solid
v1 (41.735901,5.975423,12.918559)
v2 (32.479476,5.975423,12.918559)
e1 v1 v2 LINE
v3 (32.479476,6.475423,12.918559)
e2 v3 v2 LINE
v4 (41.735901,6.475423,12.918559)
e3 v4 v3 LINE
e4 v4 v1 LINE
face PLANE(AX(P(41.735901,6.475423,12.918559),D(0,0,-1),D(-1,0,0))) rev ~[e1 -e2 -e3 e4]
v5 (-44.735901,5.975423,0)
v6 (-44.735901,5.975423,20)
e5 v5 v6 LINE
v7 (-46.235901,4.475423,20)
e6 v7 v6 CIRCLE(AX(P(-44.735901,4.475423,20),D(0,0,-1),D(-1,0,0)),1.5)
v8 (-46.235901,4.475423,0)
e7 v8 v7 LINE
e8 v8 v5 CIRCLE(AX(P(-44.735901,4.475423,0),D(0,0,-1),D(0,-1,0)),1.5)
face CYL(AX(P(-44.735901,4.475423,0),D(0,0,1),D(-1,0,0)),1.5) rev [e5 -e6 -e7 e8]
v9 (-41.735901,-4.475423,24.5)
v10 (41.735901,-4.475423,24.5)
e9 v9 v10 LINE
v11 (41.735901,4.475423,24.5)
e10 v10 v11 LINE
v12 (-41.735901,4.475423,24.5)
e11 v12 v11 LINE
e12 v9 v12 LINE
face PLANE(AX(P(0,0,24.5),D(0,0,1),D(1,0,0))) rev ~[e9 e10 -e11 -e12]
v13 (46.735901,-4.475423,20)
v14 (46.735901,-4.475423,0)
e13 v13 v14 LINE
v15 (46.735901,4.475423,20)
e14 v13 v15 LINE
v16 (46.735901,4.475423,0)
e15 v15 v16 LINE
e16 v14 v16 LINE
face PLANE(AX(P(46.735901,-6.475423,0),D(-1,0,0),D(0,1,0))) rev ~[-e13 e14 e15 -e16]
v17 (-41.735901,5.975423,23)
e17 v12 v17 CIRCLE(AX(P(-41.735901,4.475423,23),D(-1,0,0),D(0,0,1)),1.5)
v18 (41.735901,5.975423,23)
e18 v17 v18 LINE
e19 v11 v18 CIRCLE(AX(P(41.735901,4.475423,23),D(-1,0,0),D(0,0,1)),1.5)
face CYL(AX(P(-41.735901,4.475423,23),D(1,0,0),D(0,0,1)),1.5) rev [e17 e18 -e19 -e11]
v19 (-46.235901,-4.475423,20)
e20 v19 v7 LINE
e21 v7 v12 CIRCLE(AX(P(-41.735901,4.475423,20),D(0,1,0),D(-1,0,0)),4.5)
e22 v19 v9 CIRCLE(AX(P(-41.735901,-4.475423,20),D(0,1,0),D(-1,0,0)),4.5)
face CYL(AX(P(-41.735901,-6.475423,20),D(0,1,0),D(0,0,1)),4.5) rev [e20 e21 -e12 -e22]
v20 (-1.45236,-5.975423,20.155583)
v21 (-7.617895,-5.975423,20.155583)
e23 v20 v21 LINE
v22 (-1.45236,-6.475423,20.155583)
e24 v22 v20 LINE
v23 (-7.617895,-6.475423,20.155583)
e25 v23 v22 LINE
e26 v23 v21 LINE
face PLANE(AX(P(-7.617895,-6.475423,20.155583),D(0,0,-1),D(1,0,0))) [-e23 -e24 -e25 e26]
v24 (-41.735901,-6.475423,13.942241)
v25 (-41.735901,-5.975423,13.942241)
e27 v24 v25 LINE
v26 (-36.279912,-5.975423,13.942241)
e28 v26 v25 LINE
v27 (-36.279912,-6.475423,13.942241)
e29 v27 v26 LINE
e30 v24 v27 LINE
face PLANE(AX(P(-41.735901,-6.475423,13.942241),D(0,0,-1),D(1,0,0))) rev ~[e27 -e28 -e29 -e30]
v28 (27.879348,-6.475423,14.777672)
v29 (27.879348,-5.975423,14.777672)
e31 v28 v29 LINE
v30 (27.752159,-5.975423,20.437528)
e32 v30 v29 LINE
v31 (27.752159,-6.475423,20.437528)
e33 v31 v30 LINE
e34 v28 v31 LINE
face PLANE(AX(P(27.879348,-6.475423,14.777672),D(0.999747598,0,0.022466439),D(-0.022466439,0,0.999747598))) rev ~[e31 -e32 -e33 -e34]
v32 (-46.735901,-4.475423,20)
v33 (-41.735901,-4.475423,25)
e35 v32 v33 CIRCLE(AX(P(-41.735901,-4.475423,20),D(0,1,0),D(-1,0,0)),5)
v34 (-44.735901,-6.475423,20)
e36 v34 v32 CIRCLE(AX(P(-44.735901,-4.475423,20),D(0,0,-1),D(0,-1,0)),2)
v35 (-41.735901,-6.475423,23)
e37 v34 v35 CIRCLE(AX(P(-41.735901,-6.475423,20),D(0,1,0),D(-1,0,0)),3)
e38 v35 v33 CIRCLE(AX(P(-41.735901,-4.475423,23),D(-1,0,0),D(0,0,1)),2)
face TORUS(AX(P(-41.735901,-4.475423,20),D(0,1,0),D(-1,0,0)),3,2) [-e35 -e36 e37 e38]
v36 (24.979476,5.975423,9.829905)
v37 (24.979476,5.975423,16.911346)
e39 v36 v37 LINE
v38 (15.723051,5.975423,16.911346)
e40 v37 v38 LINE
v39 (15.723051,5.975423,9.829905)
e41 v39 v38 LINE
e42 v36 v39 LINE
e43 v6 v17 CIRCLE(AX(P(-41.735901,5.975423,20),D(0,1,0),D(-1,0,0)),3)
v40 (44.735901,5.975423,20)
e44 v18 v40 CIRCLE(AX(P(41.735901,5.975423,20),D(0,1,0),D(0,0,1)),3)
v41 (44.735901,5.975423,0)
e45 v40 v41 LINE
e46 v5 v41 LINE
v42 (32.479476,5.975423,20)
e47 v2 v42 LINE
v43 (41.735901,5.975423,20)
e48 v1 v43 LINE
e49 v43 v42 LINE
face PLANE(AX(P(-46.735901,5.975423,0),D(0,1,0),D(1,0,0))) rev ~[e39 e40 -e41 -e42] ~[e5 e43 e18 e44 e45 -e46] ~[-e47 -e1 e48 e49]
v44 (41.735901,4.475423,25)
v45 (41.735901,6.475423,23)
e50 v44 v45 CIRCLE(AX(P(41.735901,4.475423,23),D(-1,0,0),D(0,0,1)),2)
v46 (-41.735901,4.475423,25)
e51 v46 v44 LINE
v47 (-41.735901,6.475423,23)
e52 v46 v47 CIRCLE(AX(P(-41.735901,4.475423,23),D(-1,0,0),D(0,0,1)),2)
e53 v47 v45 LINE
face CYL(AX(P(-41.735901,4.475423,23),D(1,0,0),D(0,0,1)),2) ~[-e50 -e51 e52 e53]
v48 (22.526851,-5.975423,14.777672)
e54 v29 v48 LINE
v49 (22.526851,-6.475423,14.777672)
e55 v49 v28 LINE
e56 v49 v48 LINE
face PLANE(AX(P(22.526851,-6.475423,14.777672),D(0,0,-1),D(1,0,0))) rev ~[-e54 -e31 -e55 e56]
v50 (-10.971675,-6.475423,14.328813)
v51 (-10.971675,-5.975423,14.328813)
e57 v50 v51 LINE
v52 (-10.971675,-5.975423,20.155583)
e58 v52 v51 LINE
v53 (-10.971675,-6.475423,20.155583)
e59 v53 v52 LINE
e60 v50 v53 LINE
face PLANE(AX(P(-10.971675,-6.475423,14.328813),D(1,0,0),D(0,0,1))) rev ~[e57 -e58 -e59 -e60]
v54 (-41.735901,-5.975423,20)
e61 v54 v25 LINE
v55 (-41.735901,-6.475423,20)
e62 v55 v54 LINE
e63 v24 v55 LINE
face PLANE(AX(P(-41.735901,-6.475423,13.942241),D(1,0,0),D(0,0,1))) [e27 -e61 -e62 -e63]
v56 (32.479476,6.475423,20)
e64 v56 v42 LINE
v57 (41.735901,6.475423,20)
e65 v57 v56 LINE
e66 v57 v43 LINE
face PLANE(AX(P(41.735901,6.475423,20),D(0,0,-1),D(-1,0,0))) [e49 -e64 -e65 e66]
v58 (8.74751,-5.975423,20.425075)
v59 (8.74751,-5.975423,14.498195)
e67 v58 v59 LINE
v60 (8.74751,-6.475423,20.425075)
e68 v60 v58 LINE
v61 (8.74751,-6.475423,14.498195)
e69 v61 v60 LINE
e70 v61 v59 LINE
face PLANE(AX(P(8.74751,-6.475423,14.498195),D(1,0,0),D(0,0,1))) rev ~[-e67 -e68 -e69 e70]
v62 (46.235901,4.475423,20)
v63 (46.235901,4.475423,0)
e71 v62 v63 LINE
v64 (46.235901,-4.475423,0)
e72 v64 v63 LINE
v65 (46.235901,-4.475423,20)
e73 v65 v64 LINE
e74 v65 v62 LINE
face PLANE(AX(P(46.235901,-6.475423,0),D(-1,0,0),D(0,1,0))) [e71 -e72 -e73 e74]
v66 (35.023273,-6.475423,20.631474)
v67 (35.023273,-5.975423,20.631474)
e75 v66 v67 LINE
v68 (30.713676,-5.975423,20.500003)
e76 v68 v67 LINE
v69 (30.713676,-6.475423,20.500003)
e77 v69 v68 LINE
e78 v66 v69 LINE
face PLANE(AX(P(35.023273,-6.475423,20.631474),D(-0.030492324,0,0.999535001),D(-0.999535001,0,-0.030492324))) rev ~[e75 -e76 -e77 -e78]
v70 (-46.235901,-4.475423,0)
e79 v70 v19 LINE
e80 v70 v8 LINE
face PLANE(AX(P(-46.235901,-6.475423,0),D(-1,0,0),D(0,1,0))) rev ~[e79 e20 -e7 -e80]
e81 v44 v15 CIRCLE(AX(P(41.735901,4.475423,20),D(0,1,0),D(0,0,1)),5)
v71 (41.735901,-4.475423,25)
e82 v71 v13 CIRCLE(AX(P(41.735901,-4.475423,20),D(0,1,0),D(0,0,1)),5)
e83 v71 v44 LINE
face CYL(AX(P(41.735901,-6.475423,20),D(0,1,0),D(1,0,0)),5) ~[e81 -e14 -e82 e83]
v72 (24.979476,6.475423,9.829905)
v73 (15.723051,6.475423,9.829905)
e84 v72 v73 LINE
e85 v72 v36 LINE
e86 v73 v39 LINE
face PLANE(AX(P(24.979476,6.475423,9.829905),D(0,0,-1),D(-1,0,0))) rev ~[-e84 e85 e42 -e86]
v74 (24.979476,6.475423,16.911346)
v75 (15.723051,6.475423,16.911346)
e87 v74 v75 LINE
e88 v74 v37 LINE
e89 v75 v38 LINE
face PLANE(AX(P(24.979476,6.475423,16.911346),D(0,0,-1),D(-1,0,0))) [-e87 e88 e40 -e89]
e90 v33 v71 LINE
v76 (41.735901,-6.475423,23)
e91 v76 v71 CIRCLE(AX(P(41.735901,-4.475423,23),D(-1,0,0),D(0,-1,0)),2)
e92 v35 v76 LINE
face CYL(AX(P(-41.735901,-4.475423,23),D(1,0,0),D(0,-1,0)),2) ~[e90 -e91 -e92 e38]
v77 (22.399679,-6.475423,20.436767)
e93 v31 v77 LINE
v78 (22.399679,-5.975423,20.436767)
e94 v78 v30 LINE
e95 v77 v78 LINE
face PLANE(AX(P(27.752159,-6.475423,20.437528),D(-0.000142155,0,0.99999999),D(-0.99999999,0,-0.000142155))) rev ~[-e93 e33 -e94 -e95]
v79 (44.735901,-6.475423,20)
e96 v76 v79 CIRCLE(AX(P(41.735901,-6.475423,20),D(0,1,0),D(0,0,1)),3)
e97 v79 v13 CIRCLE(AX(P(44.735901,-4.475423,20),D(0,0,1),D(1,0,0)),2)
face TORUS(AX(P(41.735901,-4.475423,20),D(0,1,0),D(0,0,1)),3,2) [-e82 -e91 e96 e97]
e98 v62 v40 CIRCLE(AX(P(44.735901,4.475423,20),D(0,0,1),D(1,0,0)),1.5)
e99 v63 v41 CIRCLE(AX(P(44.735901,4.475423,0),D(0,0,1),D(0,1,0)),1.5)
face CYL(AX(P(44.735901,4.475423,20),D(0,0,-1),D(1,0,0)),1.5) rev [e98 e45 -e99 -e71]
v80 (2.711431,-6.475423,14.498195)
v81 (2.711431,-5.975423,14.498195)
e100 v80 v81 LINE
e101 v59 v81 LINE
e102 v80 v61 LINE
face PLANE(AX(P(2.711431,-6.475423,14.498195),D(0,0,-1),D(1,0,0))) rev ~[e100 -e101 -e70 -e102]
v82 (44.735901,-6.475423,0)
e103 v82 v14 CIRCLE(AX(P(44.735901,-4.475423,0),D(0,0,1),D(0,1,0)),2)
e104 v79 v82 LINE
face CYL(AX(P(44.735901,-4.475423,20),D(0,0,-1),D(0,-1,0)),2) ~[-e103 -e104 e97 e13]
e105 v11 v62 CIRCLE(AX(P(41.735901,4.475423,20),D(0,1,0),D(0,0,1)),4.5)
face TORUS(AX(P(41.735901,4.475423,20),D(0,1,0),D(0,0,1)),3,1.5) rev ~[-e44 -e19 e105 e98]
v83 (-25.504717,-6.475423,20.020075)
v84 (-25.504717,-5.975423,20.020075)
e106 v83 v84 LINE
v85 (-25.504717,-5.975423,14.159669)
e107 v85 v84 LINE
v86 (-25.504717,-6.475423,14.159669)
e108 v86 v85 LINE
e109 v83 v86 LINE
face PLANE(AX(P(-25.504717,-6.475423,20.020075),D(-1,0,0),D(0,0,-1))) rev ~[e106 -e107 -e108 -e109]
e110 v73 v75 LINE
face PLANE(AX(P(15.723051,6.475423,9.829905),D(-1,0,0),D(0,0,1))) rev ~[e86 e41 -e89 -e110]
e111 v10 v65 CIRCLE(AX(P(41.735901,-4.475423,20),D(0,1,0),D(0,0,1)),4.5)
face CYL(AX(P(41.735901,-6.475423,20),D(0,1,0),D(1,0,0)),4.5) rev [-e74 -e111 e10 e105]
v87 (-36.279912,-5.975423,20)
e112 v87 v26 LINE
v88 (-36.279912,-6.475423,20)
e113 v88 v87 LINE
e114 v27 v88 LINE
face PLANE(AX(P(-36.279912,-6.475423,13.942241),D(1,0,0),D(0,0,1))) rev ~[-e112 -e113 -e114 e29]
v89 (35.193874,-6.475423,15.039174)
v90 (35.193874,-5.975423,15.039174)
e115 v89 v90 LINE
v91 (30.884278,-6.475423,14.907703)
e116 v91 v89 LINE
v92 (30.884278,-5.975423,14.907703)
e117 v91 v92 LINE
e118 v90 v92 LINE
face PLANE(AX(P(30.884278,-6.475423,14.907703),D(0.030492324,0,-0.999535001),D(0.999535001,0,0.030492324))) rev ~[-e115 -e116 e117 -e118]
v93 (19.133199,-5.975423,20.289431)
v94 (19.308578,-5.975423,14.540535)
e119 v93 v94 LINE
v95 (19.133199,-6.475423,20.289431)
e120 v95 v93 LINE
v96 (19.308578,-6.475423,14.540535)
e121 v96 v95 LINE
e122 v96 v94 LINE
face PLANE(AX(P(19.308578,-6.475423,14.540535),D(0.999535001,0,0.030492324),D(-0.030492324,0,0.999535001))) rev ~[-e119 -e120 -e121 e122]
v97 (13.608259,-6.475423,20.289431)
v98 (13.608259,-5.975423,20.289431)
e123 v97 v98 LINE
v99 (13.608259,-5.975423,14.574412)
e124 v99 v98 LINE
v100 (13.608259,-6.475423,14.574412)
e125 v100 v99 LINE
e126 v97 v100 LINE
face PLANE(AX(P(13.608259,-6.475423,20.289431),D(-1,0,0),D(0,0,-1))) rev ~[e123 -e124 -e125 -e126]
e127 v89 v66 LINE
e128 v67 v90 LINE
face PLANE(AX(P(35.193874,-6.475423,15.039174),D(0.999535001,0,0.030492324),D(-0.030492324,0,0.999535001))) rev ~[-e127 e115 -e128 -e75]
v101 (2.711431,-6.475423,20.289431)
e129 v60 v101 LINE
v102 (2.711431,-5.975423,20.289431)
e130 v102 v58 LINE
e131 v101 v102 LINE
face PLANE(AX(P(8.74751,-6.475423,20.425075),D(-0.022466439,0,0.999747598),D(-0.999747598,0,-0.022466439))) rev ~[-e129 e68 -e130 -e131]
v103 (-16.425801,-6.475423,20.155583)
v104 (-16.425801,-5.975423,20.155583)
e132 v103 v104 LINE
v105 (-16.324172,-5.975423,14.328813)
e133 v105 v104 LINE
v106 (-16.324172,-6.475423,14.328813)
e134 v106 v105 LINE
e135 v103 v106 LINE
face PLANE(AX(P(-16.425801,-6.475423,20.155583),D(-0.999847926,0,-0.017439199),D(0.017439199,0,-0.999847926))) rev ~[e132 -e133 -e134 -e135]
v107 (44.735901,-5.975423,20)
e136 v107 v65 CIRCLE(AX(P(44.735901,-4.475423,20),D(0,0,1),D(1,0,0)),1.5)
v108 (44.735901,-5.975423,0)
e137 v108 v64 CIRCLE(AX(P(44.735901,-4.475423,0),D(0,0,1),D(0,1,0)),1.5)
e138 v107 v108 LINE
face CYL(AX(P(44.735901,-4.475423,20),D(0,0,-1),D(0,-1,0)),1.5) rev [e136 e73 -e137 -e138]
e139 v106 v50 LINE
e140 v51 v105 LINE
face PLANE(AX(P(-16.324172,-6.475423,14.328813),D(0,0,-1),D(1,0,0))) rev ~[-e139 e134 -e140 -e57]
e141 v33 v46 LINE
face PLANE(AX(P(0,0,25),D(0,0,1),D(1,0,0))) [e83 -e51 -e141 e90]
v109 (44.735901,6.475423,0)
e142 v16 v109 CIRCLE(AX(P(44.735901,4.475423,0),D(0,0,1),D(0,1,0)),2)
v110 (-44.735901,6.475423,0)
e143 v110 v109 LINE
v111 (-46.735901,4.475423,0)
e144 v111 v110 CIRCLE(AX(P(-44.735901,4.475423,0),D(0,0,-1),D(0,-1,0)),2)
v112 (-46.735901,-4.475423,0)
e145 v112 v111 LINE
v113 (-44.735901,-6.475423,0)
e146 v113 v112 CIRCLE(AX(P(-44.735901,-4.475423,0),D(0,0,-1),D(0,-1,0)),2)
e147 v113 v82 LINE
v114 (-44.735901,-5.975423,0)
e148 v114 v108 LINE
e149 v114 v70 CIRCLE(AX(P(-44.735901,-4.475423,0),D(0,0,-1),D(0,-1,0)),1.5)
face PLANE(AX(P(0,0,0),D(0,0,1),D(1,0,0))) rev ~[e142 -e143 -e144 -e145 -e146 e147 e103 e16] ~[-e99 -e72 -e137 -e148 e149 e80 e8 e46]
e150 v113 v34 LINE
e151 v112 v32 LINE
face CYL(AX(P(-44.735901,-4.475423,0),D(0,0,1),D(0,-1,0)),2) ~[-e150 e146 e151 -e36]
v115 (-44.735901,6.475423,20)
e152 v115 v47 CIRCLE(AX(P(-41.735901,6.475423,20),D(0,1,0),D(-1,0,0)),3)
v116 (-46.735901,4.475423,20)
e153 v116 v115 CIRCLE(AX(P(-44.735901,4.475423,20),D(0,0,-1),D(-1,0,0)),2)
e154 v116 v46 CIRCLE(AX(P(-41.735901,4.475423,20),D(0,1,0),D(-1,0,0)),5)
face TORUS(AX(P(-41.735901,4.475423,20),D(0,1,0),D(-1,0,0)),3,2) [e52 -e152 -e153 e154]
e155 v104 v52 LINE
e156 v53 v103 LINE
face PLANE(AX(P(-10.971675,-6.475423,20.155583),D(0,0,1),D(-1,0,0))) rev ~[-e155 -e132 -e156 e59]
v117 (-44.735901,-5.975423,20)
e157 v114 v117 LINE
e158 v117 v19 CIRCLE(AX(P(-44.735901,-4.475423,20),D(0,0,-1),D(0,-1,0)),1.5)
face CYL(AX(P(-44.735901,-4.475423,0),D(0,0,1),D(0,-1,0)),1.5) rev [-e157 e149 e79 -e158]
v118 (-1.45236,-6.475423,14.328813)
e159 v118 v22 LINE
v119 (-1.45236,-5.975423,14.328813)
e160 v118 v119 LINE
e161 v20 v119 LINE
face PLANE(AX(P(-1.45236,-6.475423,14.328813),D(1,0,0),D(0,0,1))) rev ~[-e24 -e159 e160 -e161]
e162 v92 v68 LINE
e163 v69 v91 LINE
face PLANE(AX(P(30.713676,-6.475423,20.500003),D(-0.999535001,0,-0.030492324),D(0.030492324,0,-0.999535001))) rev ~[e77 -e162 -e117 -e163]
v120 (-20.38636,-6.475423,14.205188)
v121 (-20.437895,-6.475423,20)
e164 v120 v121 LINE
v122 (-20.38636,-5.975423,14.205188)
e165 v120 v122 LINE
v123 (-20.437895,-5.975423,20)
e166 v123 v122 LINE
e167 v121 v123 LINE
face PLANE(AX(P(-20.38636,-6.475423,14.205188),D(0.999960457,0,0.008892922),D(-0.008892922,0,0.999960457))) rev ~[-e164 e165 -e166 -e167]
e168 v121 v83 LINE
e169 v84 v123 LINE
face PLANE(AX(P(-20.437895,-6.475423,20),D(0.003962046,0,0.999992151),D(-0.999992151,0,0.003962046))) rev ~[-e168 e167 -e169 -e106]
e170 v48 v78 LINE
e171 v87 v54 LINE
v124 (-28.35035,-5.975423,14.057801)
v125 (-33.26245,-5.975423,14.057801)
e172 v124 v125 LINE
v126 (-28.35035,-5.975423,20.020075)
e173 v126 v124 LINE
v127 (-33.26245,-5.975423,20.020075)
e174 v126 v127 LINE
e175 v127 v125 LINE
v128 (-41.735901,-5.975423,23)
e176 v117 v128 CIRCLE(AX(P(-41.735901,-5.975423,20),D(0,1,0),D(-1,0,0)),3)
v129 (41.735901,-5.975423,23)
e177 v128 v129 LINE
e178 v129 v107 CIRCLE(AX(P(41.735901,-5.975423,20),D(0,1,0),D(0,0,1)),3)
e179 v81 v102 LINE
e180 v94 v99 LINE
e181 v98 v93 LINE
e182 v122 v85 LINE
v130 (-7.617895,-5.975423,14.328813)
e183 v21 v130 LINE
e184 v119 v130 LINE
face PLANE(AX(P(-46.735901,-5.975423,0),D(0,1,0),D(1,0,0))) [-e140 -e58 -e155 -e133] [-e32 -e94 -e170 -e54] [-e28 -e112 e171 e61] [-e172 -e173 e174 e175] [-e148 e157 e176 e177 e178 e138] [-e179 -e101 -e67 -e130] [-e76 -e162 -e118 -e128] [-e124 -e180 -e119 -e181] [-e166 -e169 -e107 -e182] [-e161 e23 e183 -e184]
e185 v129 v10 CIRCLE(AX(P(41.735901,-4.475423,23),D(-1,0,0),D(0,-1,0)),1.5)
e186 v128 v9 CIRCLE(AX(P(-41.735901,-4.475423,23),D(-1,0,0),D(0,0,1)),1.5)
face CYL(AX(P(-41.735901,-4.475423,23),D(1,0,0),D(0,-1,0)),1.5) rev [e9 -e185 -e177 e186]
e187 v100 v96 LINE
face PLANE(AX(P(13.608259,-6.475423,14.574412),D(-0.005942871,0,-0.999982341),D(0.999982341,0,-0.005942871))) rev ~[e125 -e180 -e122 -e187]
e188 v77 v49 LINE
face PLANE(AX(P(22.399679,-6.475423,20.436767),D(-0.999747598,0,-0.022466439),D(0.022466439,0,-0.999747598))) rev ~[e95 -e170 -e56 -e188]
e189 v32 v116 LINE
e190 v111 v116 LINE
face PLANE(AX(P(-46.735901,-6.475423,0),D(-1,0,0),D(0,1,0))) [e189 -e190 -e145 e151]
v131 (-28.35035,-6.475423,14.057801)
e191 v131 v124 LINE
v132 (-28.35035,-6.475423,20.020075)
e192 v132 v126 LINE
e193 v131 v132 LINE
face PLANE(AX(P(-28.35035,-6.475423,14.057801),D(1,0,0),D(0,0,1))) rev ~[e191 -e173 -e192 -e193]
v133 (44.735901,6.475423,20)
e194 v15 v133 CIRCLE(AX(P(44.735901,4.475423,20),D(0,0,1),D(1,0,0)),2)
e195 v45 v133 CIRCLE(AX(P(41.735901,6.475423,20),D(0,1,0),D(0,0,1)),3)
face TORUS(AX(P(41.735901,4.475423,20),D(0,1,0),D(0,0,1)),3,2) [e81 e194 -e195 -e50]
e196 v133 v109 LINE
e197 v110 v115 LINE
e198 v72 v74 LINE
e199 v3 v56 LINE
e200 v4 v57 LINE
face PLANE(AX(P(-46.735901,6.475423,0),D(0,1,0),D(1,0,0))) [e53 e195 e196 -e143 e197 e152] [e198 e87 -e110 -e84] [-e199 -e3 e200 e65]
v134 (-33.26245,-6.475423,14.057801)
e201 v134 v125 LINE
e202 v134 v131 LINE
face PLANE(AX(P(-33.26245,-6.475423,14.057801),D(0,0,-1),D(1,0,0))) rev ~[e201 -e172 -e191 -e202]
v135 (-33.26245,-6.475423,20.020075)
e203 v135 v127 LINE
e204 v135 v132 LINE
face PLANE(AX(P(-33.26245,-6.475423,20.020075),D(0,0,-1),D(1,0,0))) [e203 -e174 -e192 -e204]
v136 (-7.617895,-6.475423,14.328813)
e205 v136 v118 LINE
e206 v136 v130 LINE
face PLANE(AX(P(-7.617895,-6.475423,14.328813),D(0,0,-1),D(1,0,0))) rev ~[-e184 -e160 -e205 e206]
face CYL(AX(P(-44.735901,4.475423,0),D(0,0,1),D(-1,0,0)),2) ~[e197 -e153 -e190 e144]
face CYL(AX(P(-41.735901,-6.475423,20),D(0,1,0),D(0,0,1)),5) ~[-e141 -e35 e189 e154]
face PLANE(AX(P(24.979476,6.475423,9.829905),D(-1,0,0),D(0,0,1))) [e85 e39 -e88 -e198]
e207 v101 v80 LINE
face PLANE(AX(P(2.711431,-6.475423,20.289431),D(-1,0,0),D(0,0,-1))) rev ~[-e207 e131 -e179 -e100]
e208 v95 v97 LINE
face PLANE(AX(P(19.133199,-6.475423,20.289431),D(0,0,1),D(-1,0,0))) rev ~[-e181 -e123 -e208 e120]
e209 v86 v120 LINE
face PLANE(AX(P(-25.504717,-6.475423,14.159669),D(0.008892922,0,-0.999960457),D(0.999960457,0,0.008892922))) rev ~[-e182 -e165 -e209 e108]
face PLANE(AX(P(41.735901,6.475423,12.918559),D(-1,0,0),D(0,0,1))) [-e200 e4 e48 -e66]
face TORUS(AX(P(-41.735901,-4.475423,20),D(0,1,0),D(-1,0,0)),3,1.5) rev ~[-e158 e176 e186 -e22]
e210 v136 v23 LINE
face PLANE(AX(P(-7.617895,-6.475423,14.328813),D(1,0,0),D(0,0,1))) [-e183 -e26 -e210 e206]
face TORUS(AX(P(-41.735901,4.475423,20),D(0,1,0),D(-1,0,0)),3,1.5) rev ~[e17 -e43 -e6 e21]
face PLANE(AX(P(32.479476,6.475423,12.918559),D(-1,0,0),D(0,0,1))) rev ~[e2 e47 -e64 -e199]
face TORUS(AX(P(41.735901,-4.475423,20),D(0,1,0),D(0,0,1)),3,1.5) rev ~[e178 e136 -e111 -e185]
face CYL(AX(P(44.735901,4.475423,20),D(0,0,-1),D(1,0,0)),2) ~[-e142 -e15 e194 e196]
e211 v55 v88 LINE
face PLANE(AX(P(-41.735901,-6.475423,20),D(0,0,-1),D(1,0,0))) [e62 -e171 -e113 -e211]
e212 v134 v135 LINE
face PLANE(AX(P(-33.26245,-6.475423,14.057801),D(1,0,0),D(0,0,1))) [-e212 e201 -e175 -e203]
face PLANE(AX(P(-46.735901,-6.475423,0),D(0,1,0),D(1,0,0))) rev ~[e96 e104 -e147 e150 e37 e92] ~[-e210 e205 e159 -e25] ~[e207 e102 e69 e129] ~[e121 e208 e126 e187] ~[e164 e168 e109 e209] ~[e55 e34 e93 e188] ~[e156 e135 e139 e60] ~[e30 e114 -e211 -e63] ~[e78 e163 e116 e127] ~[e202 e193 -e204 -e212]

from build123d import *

# Parameters (mm, degrees)
F0_W     = 93.4718027711
F0_H     = 12.9508469254
F1_DEPTH = 25
F2_R     = 5
F3_R     = 5
F4_R     = 2
F5_T     = -0.5
F6_W     = 5.4559892522
F6_H     = 6.0577589622
F6_W_2   = 4.9121007323
F6_H_2   = 5.9622740373
F6_W_3   = 6.1655344907
F6_H_3   = 5.8267693967
F7_DEPTH = 10
F8_W     = 9.2564252019
F8_H     = 7.081441097
F9_DEPTH = 5


with BuildPart() as f1:
    # F0 (on Top) → F1 (new body)
    with BuildSketch(Plane.XY):
        Rectangle(F0_W, F0_H)
    extrude(amount=F1_DEPTH)

    # F2
    f2_edges = [f1.edges().sort_by_distance(p)[0] for p in [
        (46.735901, 0, 25),
    ]]
    fillet(f2_edges, radius=F2_R)

    # F3
    f3_edges = [f1.edges().sort_by_distance(p)[0] for p in [
        (-46.735901, 0, 25),
    ]]
    fillet(f3_edges, radius=F3_R)

    # F4
    f4_edges = [f1.edges().sort_by_distance(p)[0] for p in [
        (0, -6.475423, 25),
        (0, 6.475423, 25),
        (46.735901, 6.475423, 10),
        (46.735901, -6.475423, 10),
        (-46.735901, -6.475423, 10),
        (-45.271435, -6.475423, 23.535534),
        (45.271435, -6.475423, 23.535534),
        (-45.271435, 6.475423, 23.535534),
        (45.271435, 6.475423, 23.535534),
        (-46.735901, 6.475423, 10),
    ]]
    fillet(f4_edges, radius=F4_R)

    # F5
    f5_openings = [f1.faces().sort_by_distance(p)[0] for p in [
        (0, 0, 0),
    ]]
    offset(amount=F5_T, openings=f5_openings)

    # F6 (on face) → F7 (cut)
    with BuildSketch(Plane.XZ.offset(6.4754234627)):
        with Locations((-39.0079067595, 16.9711205189)):
            Rectangle(F6_W, F6_H)
        with Locations((-30.8063998818, 17.0389381237)):
            Rectangle(F6_W_2, F6_H_2)
        Polygon((-25.5047174612, 20.0200751424), (-25.5047174612, 14.1596693691), (-20.3863596622, 14.2051883272), (-20.43789451, 20), align=None)
        Polygon((-16.4258014411, 20.155582577), (-16.3241717964, 14.3288131803), (-10.9716746956, 14.3288131803), (-10.9716746956, 20.155582577), align=None)
        with Locations((-4.5351273147, 17.2421978787)):
            Rectangle(F6_W_3, F6_H_3)
        Polygon((2.711430509, 20.2894311491), (2.711430509, 14.4981949606), (8.747510295, 14.4981949606), (8.747510295, 20.4250746066), align=None)
        Polygon((19.1331994785, 20.2894311491), (13.6082590709, 20.2894311491), (13.6082590709, 14.5744122565), (19.308578223, 14.5405353978), align=None)
        Polygon((22.3996791117, 20.4367674267), (22.5268509239, 14.7776724771), (27.8793480247, 14.7776724771), (27.7521591139, 20.4375283061), align=None)
        Polygon((30.7136761403, 20.5000031751), (30.8842776962, 14.9077031341), (35.1938740726, 15.0391738782), (35.0232725167, 20.6314739191), align=None)
    extrude(amount=-F7_DEPTH, mode=Mode.SUBTRACT)

    # F8 (on face) → F9 (cut)
    with BuildSketch(Plane(origin=(0, 6.4754234627, 0), x_dir=(-1, 0, 0), z_dir=(0, 1, 0))):
        with Locations((-37.1076887846, 16.4592794515)):
            Rectangle(F8_W, F8_H)
        with Locations((-20.3512632847, 13.3706254326)):
            Rectangle(F8_W, F8_H)
    extrude(amount=-F9_DEPTH, mode=Mode.SUBTRACT)


solid = f1.part
